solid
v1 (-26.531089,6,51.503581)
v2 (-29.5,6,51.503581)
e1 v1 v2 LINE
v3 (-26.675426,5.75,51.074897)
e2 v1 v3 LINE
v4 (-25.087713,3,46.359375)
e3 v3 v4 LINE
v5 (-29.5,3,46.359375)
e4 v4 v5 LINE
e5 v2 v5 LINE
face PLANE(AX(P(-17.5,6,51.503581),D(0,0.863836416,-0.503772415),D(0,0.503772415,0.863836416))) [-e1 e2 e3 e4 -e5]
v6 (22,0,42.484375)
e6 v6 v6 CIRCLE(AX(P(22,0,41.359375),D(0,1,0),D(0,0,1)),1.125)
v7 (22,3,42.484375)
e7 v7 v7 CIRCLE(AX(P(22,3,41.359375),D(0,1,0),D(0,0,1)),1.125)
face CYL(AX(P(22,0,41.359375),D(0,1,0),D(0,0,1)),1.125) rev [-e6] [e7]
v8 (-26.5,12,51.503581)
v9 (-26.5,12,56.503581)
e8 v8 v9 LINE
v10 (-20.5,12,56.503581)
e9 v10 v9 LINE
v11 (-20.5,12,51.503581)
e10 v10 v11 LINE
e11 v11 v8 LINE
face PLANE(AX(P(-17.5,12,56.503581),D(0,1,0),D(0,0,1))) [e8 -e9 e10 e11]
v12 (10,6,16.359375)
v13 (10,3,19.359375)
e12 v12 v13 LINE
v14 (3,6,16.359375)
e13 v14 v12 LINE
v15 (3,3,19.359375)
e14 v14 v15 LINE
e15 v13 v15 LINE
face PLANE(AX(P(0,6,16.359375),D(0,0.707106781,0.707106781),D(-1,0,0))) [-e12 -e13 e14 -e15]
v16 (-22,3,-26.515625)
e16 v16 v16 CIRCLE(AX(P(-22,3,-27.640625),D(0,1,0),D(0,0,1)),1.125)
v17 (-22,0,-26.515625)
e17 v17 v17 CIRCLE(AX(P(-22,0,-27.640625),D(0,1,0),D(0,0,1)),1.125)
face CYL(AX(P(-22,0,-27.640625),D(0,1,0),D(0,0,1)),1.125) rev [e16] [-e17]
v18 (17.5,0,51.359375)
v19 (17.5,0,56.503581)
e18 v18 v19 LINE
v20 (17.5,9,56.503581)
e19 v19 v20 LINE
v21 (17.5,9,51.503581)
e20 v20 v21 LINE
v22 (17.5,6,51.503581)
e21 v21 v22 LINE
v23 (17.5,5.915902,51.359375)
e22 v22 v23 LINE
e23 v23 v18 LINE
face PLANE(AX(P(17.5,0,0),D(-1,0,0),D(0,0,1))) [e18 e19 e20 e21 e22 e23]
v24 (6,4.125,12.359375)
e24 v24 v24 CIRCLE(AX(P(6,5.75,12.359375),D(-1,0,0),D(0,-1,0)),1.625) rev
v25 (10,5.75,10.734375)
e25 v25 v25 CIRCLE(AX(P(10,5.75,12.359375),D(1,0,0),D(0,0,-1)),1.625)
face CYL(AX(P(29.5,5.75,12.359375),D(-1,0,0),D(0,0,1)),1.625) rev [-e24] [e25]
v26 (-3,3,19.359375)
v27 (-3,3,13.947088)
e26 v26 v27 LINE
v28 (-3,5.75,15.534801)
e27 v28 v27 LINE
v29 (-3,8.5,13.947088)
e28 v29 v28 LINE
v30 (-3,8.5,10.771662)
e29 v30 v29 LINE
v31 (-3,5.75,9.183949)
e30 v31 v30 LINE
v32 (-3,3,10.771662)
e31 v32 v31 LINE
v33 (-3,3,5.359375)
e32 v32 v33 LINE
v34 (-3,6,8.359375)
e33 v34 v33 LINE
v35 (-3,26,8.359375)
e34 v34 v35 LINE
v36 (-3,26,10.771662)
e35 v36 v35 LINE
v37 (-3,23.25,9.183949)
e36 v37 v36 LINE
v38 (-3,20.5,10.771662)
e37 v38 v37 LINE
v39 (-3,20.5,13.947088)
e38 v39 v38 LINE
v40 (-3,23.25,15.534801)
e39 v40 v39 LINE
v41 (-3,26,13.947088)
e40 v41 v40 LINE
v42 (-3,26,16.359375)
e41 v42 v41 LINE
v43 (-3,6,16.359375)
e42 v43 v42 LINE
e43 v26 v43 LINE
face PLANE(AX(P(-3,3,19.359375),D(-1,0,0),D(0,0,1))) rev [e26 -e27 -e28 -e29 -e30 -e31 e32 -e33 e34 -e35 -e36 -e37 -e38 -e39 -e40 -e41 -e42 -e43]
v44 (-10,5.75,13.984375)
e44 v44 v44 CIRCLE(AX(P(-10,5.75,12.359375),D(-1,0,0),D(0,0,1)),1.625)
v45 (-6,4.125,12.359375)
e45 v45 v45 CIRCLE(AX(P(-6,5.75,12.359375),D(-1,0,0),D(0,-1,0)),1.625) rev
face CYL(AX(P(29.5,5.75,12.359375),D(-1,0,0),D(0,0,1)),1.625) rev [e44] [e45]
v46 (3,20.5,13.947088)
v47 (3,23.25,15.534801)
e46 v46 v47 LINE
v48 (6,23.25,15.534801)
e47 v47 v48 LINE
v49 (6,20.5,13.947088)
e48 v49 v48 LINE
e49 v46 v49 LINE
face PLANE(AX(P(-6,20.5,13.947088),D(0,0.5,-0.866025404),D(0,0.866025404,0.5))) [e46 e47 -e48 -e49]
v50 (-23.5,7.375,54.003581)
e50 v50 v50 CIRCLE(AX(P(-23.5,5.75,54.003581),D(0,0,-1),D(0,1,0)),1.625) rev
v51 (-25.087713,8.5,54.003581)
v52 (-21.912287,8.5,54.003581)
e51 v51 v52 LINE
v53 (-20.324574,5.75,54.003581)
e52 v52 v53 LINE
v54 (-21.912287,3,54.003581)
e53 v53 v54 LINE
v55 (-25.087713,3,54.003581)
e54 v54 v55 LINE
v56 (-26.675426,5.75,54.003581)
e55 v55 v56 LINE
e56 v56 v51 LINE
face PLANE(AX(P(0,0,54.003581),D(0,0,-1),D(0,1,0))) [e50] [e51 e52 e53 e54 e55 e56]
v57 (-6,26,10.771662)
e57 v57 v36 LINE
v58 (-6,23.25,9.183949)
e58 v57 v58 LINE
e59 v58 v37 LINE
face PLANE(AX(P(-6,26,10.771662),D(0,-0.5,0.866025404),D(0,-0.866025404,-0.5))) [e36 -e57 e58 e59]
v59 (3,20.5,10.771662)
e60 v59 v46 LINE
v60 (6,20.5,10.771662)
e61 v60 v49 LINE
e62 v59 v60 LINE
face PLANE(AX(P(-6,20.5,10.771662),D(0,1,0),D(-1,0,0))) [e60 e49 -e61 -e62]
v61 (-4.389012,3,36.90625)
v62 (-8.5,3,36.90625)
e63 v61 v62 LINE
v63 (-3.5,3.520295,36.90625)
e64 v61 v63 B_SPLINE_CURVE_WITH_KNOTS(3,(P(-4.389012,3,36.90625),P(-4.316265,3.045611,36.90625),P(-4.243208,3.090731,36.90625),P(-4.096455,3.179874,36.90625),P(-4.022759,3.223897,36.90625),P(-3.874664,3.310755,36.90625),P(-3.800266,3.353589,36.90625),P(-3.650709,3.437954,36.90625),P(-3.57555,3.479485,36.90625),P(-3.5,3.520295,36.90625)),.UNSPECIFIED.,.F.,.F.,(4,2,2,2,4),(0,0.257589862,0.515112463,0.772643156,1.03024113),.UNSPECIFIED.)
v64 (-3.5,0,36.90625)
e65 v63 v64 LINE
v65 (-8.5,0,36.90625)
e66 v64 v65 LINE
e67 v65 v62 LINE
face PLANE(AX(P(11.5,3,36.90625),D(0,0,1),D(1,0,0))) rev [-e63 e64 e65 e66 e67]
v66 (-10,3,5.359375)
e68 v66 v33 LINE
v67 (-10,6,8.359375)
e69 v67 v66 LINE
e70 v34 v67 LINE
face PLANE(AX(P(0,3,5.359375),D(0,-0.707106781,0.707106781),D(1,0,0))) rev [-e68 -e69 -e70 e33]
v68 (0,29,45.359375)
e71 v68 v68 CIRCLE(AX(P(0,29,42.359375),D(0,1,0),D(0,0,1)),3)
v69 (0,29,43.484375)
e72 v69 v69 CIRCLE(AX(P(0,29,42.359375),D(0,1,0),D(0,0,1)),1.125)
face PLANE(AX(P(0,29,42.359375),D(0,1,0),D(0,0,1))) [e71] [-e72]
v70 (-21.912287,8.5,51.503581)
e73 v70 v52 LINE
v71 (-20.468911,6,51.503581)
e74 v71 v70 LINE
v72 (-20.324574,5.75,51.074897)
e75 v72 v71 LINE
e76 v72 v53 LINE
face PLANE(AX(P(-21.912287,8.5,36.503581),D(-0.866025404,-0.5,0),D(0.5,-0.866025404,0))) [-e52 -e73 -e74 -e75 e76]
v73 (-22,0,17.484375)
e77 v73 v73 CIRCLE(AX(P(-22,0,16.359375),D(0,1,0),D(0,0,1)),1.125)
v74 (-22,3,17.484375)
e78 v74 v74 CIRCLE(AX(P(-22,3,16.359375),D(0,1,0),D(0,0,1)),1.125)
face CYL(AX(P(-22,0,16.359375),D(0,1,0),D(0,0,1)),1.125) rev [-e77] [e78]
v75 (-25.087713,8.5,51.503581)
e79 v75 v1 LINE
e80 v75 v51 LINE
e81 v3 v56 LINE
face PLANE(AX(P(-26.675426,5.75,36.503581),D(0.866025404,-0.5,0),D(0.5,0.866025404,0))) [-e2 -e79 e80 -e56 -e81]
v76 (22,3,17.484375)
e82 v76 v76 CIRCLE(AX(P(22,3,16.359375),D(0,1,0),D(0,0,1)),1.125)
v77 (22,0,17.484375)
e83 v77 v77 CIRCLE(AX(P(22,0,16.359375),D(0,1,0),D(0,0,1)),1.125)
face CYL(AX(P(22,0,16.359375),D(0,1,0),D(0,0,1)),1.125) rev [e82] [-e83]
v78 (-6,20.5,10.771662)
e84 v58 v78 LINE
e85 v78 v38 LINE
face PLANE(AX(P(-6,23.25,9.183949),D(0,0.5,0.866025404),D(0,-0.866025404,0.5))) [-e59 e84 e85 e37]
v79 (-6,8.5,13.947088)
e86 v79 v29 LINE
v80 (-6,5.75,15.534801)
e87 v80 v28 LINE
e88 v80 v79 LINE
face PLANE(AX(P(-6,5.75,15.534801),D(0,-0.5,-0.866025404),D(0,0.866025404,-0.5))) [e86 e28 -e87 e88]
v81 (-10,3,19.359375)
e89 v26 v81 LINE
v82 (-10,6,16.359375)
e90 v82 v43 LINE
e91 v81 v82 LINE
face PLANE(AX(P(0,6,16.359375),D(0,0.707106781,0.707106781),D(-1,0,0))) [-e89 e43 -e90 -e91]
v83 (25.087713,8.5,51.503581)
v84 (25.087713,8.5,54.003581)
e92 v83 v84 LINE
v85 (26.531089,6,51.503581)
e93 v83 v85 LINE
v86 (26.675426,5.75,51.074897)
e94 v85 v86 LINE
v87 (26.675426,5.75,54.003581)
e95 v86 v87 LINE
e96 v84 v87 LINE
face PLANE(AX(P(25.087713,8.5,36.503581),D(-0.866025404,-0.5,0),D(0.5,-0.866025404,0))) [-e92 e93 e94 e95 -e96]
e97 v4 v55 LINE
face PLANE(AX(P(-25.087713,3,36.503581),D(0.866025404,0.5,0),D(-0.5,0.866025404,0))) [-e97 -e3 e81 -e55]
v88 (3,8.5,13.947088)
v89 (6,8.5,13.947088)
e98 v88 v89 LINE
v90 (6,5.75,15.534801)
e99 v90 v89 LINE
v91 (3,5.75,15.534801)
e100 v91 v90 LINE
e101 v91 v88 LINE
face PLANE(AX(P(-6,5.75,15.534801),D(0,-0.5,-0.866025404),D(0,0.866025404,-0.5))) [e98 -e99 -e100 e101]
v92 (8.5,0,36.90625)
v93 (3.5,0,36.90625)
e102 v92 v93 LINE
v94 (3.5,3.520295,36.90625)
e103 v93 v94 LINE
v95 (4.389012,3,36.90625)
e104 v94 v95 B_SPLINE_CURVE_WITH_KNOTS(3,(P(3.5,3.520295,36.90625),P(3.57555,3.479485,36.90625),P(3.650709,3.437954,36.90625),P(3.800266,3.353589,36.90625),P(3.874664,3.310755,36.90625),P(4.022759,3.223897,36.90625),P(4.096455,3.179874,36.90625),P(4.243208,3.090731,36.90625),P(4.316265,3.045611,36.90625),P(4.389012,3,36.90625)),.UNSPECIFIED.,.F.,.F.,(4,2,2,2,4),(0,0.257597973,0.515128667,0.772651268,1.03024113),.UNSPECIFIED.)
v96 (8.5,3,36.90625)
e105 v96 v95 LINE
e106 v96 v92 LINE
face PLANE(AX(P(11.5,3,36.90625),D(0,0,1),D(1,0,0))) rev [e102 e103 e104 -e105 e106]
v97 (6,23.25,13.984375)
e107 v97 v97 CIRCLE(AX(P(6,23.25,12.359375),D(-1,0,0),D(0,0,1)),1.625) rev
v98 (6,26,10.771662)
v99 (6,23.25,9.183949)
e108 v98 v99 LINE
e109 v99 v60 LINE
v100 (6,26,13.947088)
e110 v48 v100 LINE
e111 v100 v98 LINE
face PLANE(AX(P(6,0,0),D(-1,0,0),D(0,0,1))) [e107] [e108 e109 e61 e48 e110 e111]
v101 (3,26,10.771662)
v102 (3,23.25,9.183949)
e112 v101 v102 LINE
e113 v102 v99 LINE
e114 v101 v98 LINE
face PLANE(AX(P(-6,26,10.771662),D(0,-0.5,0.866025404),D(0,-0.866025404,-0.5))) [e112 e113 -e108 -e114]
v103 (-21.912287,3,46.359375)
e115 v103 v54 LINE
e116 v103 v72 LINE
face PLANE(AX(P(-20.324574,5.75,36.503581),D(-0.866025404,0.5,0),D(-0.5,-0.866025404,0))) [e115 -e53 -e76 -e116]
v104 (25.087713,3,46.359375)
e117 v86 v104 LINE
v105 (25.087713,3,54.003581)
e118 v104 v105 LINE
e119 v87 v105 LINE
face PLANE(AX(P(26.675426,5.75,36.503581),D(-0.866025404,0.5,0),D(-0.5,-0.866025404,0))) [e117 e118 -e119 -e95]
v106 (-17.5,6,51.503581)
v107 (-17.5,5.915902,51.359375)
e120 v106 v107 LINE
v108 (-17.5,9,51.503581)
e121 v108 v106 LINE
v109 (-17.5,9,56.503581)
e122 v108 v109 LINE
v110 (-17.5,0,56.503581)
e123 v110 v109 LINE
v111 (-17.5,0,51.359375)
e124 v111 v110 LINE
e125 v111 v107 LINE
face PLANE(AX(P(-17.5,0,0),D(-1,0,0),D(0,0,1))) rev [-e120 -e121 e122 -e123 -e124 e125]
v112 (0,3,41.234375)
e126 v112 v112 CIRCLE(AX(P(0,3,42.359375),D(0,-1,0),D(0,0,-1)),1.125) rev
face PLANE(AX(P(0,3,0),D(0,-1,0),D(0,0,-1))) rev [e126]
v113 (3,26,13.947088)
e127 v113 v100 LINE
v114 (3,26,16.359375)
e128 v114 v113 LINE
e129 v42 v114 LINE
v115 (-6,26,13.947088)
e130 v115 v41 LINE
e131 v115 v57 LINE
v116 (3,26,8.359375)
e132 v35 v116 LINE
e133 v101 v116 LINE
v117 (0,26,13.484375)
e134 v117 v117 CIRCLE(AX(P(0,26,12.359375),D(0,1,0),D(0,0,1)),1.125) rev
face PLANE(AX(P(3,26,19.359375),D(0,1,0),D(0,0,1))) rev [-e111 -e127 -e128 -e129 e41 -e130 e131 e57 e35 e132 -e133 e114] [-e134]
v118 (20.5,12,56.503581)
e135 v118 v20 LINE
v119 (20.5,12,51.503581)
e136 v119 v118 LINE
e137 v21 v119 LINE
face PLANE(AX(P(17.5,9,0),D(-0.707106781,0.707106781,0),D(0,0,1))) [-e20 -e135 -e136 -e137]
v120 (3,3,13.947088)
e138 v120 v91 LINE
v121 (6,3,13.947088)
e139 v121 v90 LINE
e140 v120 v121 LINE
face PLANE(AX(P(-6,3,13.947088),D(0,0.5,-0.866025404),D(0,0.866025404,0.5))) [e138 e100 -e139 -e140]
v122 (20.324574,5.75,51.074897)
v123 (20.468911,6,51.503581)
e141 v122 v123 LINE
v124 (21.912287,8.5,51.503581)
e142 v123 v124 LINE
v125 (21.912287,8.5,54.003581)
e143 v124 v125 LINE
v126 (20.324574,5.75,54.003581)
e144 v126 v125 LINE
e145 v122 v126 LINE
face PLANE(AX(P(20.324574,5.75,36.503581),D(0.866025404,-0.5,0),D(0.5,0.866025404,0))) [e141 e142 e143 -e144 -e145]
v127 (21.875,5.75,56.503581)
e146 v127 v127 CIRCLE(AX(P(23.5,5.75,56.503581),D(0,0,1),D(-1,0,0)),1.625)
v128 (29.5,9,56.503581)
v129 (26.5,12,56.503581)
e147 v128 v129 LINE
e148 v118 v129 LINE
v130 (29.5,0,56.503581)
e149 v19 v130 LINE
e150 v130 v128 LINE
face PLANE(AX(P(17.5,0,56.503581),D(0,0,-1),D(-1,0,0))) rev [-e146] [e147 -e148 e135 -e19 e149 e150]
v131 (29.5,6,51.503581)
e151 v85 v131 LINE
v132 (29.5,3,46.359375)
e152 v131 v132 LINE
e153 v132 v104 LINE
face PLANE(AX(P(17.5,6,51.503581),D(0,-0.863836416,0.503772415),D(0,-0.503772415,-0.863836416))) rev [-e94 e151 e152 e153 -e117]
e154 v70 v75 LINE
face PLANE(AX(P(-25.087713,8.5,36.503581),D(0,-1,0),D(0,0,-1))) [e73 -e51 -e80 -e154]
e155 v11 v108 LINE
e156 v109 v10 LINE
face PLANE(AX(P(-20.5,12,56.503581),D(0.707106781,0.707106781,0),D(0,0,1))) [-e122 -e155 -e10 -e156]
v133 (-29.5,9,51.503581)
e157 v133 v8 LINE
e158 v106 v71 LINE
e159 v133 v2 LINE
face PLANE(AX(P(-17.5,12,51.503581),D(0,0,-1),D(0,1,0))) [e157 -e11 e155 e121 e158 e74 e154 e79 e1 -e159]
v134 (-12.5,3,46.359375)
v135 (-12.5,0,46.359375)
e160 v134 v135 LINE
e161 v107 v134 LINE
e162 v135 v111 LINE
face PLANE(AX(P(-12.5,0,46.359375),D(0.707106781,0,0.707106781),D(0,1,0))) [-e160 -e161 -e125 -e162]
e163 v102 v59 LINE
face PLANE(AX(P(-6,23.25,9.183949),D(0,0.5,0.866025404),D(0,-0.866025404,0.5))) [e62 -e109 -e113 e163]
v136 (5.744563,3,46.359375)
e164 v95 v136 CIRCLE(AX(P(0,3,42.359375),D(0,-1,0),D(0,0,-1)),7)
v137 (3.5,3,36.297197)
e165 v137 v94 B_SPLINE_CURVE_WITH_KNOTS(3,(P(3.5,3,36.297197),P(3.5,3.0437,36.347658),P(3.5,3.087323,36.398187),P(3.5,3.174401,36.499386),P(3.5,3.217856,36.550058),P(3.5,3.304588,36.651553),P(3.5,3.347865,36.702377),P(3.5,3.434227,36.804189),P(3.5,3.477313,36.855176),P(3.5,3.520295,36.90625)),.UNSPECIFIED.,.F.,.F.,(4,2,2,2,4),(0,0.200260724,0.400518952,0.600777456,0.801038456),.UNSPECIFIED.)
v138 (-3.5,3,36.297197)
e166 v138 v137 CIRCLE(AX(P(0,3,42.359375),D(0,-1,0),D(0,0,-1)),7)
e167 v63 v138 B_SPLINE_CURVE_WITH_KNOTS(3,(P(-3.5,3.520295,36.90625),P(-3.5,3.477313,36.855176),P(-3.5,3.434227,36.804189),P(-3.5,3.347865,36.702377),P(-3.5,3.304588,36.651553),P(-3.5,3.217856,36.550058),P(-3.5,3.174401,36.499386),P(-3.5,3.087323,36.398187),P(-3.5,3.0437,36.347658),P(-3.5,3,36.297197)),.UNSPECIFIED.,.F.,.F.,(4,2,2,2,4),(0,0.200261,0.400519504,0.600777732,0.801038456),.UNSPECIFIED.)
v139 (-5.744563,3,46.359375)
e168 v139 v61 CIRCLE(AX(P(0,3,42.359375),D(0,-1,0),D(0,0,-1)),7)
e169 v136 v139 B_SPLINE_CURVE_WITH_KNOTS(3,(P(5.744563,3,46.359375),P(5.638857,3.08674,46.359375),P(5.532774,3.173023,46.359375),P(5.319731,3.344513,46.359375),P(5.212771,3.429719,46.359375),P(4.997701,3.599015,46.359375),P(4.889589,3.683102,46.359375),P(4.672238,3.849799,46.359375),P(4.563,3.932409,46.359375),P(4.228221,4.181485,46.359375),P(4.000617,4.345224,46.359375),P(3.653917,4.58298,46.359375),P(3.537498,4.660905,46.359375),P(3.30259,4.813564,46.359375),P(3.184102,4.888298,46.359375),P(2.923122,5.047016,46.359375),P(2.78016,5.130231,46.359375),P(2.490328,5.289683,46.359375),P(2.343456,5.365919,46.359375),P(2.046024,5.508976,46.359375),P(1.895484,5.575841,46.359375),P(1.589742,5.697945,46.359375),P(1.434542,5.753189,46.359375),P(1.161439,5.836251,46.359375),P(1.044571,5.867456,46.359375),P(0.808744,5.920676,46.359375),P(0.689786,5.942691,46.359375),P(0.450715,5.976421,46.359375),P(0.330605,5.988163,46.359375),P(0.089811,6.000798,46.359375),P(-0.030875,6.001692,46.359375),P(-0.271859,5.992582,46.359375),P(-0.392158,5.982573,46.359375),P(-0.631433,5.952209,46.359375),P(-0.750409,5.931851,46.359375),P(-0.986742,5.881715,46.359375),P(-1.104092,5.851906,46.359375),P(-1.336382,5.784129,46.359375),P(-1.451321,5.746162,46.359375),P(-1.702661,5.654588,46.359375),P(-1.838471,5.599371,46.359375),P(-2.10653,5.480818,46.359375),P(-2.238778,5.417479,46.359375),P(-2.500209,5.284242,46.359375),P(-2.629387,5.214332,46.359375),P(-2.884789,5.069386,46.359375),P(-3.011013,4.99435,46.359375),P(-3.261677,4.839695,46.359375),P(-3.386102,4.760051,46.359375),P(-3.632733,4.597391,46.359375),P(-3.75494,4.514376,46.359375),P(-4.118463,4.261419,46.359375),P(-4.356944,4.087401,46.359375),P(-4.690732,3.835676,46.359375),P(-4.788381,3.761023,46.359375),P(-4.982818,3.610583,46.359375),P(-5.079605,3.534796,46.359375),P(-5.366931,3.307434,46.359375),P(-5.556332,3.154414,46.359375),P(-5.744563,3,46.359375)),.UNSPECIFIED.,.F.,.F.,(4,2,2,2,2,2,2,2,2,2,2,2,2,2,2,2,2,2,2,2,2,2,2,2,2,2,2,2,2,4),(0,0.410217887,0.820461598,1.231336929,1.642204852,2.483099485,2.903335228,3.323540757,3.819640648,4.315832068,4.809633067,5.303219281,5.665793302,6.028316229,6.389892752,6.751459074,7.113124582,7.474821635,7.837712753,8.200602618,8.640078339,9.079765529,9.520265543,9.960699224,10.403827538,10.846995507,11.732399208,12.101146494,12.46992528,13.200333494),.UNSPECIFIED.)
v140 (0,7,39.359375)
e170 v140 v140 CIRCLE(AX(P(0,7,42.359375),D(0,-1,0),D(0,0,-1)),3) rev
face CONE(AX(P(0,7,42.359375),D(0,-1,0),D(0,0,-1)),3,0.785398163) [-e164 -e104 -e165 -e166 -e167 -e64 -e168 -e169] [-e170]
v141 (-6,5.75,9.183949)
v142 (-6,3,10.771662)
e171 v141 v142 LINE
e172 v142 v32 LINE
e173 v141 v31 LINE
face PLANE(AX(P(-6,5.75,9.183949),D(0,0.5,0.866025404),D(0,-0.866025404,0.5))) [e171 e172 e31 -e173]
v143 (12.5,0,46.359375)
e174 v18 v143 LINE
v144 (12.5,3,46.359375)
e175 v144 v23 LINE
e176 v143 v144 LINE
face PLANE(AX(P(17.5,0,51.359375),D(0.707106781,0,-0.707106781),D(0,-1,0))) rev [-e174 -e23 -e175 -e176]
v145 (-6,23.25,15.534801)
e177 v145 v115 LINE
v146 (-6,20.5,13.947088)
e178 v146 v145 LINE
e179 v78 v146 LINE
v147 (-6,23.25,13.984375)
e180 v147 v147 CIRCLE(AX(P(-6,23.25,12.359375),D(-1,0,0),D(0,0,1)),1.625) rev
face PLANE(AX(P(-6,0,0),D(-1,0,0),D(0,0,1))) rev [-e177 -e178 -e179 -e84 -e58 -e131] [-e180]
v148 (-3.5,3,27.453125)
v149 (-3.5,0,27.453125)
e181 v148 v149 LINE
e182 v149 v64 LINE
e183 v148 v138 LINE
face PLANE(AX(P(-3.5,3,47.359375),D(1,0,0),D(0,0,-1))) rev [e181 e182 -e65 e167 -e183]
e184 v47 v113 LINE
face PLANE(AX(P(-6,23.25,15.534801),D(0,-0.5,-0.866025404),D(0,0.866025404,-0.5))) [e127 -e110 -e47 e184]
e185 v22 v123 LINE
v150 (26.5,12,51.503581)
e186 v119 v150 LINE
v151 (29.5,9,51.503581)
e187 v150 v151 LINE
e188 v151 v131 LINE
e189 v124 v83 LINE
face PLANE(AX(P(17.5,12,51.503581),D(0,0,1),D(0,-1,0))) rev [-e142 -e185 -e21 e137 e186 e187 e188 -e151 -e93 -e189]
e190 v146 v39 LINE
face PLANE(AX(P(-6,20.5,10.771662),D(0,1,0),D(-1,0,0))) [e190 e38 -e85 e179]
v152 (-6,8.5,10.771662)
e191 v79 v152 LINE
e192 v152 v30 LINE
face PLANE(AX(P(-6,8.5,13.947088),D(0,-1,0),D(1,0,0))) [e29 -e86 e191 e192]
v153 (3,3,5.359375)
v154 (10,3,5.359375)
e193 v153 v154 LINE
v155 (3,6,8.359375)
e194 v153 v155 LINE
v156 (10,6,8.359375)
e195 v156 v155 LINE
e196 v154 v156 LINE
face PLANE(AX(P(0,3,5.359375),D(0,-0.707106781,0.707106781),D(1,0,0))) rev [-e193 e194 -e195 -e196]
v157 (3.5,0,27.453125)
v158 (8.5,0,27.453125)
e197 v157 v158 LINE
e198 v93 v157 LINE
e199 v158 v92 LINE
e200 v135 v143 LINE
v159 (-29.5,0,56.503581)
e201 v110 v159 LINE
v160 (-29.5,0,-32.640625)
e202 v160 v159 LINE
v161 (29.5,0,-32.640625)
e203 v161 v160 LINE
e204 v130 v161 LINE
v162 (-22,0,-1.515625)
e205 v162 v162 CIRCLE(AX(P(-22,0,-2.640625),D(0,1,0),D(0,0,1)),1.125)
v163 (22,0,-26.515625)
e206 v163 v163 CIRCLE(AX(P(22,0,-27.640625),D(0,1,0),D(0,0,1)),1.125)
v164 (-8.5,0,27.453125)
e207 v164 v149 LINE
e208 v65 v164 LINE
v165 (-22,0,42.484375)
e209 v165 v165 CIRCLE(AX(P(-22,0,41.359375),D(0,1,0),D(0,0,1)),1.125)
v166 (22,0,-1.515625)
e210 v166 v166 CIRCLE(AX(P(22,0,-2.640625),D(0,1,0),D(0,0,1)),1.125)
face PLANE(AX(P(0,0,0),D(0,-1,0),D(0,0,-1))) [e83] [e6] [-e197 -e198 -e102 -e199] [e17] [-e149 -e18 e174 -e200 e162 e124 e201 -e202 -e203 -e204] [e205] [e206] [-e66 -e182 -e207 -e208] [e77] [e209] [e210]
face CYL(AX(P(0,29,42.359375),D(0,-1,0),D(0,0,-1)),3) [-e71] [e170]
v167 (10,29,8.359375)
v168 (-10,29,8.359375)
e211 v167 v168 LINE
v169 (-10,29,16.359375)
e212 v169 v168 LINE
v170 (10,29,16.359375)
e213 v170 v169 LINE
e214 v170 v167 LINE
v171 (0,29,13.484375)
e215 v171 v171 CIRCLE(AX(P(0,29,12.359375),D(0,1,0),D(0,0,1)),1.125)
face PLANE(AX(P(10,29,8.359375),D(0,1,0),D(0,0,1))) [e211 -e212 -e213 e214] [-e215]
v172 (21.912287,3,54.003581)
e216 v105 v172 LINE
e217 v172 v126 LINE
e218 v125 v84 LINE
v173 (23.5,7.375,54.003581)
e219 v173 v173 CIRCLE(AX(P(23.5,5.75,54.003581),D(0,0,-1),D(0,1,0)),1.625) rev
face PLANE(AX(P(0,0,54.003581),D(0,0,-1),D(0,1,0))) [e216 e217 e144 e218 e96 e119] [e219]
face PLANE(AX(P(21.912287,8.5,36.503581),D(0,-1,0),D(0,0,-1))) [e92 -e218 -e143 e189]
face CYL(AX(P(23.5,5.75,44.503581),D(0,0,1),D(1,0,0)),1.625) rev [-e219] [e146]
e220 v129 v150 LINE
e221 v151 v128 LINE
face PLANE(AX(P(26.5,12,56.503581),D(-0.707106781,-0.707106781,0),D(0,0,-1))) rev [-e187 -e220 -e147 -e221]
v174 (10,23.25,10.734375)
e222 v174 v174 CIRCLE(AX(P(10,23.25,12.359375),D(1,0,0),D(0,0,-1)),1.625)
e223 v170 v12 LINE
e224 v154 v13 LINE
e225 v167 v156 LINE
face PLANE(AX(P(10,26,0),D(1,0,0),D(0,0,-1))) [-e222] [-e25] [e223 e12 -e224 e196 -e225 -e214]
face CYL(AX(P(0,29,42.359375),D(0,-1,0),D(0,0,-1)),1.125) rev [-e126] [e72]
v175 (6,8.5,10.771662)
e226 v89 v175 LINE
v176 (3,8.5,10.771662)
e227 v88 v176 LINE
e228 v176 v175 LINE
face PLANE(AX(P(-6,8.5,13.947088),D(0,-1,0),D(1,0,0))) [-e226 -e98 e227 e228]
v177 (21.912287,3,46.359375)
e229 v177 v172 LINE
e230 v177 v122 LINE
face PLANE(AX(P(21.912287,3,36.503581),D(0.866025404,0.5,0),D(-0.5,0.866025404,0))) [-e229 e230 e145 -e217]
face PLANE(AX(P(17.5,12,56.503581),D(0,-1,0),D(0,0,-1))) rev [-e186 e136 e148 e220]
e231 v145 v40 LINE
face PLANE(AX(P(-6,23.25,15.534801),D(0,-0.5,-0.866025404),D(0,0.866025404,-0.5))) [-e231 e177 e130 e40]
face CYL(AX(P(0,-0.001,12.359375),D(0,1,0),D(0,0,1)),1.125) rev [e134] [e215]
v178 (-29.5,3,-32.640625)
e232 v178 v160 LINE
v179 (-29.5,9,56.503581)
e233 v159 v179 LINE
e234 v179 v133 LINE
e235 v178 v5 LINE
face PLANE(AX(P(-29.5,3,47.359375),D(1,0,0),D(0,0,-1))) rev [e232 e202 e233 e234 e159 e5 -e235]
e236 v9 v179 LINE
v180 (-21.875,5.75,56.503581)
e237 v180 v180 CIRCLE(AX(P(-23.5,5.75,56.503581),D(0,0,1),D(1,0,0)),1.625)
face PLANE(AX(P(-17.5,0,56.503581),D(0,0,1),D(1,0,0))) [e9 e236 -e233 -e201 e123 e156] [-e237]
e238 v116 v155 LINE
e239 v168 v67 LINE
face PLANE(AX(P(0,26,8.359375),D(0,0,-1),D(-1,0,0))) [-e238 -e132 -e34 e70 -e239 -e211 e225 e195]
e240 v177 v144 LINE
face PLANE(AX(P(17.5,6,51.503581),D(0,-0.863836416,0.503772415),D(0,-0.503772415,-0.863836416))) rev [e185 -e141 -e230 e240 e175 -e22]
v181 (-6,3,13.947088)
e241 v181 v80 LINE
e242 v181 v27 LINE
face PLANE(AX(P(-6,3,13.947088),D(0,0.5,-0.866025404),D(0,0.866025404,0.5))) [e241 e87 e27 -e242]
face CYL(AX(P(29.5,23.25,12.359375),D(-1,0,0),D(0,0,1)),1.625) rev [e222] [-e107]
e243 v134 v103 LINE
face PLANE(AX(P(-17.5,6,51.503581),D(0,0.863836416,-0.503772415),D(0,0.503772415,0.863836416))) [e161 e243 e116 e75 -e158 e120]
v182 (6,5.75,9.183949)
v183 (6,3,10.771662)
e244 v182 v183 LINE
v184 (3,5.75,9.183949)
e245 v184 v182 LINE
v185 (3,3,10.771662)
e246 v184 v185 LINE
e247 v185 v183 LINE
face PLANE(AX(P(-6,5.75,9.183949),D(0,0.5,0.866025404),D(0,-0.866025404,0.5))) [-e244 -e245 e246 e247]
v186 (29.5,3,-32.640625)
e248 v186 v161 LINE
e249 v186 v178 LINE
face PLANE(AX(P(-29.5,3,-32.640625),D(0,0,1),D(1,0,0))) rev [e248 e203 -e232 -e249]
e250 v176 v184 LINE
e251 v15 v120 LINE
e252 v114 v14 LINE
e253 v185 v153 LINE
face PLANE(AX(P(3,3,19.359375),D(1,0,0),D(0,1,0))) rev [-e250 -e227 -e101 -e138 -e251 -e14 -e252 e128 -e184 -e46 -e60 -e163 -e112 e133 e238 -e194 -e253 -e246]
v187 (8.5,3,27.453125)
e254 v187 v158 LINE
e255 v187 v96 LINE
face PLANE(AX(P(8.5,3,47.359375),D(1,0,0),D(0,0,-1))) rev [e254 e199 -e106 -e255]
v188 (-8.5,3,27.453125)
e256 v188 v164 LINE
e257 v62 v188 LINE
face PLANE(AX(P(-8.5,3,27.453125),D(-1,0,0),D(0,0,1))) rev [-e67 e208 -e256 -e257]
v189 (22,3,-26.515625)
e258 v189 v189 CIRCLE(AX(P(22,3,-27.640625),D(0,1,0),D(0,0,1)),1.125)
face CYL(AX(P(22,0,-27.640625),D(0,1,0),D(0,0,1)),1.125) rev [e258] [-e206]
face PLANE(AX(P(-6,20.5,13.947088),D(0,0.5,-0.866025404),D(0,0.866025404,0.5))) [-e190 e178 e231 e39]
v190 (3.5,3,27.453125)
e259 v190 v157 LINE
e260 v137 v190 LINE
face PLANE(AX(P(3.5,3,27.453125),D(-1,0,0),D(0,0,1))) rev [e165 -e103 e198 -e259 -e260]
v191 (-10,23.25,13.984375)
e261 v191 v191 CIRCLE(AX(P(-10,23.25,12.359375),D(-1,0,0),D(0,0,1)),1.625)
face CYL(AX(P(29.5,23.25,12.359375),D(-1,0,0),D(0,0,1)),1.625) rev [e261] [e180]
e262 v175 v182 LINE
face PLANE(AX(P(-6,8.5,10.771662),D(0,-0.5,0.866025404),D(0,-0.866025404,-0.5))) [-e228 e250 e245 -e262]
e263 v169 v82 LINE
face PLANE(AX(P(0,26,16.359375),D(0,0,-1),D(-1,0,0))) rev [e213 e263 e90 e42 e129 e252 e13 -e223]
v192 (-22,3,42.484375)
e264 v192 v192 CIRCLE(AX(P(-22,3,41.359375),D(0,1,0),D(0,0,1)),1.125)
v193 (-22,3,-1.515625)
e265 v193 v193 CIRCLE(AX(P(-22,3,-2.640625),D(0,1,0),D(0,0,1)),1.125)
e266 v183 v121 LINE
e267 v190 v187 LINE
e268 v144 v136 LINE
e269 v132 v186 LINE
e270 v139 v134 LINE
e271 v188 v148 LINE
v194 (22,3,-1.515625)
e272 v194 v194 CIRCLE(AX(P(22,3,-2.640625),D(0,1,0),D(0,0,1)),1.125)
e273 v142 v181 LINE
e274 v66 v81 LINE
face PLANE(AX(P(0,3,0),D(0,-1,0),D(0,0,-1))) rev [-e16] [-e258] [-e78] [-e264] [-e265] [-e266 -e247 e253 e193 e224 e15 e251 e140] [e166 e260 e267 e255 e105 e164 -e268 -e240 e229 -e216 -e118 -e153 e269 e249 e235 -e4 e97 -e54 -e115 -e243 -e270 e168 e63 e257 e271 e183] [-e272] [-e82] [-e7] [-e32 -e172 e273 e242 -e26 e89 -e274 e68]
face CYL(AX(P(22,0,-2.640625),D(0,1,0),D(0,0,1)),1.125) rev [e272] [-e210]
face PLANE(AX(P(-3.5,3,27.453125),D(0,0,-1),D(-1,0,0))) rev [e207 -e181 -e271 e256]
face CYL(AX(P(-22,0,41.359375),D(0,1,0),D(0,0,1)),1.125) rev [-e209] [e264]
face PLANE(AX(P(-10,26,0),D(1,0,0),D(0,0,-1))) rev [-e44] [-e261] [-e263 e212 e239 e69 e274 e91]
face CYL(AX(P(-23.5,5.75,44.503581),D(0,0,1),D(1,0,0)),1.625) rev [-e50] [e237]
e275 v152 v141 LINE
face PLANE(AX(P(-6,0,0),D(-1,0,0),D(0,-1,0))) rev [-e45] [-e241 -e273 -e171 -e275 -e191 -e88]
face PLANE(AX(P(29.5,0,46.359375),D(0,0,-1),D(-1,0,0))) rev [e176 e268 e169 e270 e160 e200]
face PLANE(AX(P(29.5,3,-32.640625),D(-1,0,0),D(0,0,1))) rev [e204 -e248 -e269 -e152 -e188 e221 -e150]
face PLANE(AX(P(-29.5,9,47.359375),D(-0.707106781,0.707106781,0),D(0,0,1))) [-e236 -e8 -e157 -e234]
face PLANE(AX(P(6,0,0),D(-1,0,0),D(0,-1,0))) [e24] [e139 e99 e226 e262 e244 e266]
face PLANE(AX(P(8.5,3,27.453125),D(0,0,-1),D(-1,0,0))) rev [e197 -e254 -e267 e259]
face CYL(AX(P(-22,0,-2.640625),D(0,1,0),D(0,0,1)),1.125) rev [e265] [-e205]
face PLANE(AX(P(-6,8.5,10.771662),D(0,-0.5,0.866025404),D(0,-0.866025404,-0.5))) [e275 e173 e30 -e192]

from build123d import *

# Parameters (mm, degrees)
BASE_DEPTH                     = 3
SKETCH1_W                      = 20
SKETCH1_H                      = 7
SKETCH1_H_2                    = 8
SKETCH1_W_2                    = 7
SKETCH1_H_3                    = 38.5
SOPORTE_MOTORES_DEPTH          = 23
SOPORTE_PALA_DEPTH             = 85.65548432
SKETCH3_R                      = 1.625
AGUJEROS_MOTORES_DEPTH         = 73.427902257
SKETCH4_R                      = 1
AGUJEROS_PALA_DEPTH            = 4
HUECO_SOPORTE_POSTERIOR_DEPTH  = 10
CORTE_SOPORTE_PALA_MOTOR_REACH = 71.098
BOSS_EXTRUDE2_DEPTH            = 20
CHAMFER1_SIZE                  = 3
CORTAR_EXTRUIR1_DEPTH          = 85.65548432
CORTAR_EXTRUIR1_DEPTH_BACK     = 85.65548432
SALIENTE_EXTRUIR1_START        = -59
SALIENTE_EXTRUIR1_DEPTH        = 12
SALIENTE_EXTRUIR2_DEPTH        = 12
CHAFL_N1_SIZE                  = 5
CROQUIS7_R                     = 1.625
CORTAR_EXTRUIR2_DEPTH          = 12
CORTAR_EXTRUIR3_DEPTH          = 15
CORTAR_EXTRUIR3_DEPTH_BACK     = 2.5
CORTAR_EXTRUIR5_DEPTH          = 86.730127162
CORTAR_EXTRUIR5_DEPTH_BACK     = 86.730127162
CROQUIS10_W                    = 13.75510153
CROQUIS10_H                    = 25.014777128
SALIENTE_EXTRUIR3_START        = -20
CROQUIS11_W                    = 8
CROQUIS11_H                    = 3
SALIENTE_EXTRUIR3_DEPTH        = 20
CORTAR_EXTRUIR6_START          = -11
CROQUIS12_W                    = 6
CROQUIS12_H                    = 23
CORTAR_EXTRUIR6_DEPTH          = 14
CORTAR_EXTRUIR7_DEPTH          = 9
CORTAR_EXTRUIR7_DEPTH_BACK     = 3
CHAFL_N2_SIZE                  = 3
CROQUIS14_R                    = 3
CROQUIS14_R_2                  = 1.125
SALIENTE_EXTRUIR4_DEPTH        = 26
CHAFL_N3_SIZE                  = 4
CORTAR_EXTRUIR8_REACH          = 72.028
CROQUIS15_R                    = 1.125
CROQUIS16_R                    = 1.125
CORTAR_EXTRUIR9_DEPTH          = 69.839702957


with BuildPart() as part:
    # Croquis1 → Base (new body)
    with BuildSketch(Plane(origin=(0, 0, 0), x_dir=(1, 0, 0), z_dir=(0, 1, 0))):
        Polygon((-29.5, 32.640625), (29.5, 32.640625), (29.5, -47.359375), (8.5, -47.359375), (8.5, -27.453125), (3.5, -27.453125), (3.5, -47.359375), (-3.5, -47.359375), (-3.5, -27.453125), (-8.5, -27.453125), (-8.5, -47.359375), (-29.5, -47.359375), align=None)
    extrude(amount=BASE_DEPTH)

    # Sketch1 → Soporte Motores (add)
    with BuildSketch(Plane(origin=(0, 3, 0), x_dir=(1, 0, 0), z_dir=(0, 1, 0))):
        with Locations((0, 19.640625)):
            Rectangle(SKETCH1_W, SKETCH1_H)
        with Locations((0, -12.359375)):
            Rectangle(SKETCH1_W, SKETCH1_H_2)
        with Locations((0, -35.609375)):
            Rectangle(SKETCH1_W_2, SKETCH1_H_3)
    extrude(amount=SOPORTE_MOTORES_DEPTH)

    # Sketch2 → Soporte Pala (cut, through all)
    with BuildSketch(Plane(origin=(29.5, 0, 0), x_dir=(0, 0, -1), z_dir=(1, 0, 0))):
        Polygon((-54.859375, 26), (-46.359375, 0), (-47.359375, 0), (-47.359375, 3), (-54.859375, 3), align=None)
    extrude(amount=-SOPORTE_PALA_DEPTH, mode=Mode.SUBTRACT)

    # Sketch3 → Agujeros Motores (cut, through all)
    with BuildSketch(Plane.ZY.offset(10)):
        with Locations((12.359375, 5.75)):
            Circle(SKETCH3_R)
        with Locations((12.359375, 23.25)):
            Circle(SKETCH3_R)
    extrude(amount=-AGUJEROS_MOTORES_DEPTH, mode=Mode.SUBTRACT)

    # Sketch4 → Agujeros pala (cut)
    with BuildSketch(Plane(origin=(0, -13.692511694, 41.882976946), x_dir=(1, 0, 0), z_dir=(0, -0.31073885630742226, 0.9504953251756452))):
        with Locations(Location((0, 19.405659167, 0), (0, 0, 270))):
            Circle(SKETCH4_R)
        with Locations(Location((0, 29.405659167, 0), (0, 0, 270))):
            Circle(SKETCH4_R)
    extrude(amount=-AGUJEROS_PALA_DEPTH, mode=Mode.SUBTRACT)

    # Croquis2 → Hueco Soporte Posterior (cut)
    with BuildSketch(Plane(origin=(0, 0, -23.140625), x_dir=(-1, 0, 0), z_dir=(0, 0, -1))):
        Polygon((-5, 6), (-5, 3), (5, 3), (5, 6), (5, 21), (-5, 21), align=None)
    extrude(amount=-HUECO_SOPORTE_POSTERIOR_DEPTH, mode=Mode.SUBTRACT)

    # Croquis3 → Corte_Soporte_PALA_MOTOR (cut, up to next)
    with BuildSketch(Plane.ZY.offset(3.5), mode=Mode.PRIVATE) as corte_soporte_pala_motor_sk1:
        Polygon((21.90625, 3), (36.90625, 3), (36.90625, 26), (21.90625, 26), (16.359375, 26), (16.359375, 3), align=None)
    corte_soporte_pala_motor_tool1 = extrude(corte_soporte_pala_motor_sk1.sketch, amount=-CORTE_SOPORTE_PALA_MOTOR_REACH, mode=Mode.PRIVATE) & part.part
    add(corte_soporte_pala_motor_tool1.solids().sort_by_distance((-3.5, 14.5, 26.632812))[0], mode=Mode.SUBTRACT)

    # Sketch5 → Boss-Extrude2 (add)
    with BuildSketch(Plane(origin=(-8.5, 0, 0), x_dir=(0, 0, -1), z_dir=(1, 0, 0))):
        Polygon((-36.90625, 3), (-36.90625, 0), (-46.359375, 0), (-47.340144231, 3), align=None)
    extrude(amount=BOSS_EXTRUDE2_DEPTH)

    # Chamfer1
    # the kernel refuses this chamfer: 3 mm, written as the material it adds along each edge
    with BuildSketch(Plane(origin=(10, 3, -16.140625), x_dir=(0, -0.02749587661058635, 0.9996219169112968), z_dir=(-1, 0, 0)), Plane(origin=(5, 3, -23.140625), x_dir=(0, -0.027495876610586365, -0.9996219169112968), z_dir=(1, 0, 0)), Plane(origin=(-5, 3, -16.140625), x_dir=(0, -0.02749587661058635, 0.9996219169112968), z_dir=(-1, 0, 0)), Plane(origin=(-10, 3, -23.140625), x_dir=(0, -0.027495876610586365, -0.9996219169112968), z_dir=(1, 0, 0))) as chamfer1_piece_1:
        Polygon((CHAMFER1_SIZE * 0.999621916911, CHAMFER1_SIZE * 0.0274958766106), (-CHAMFER1_SIZE * 0.0274958766106, CHAMFER1_SIZE * 0.999621916911), (0, 0), align=None)
    extrude(amount=5)
    with BuildSketch(Plane(origin=(-5, 3, -23.140625), x_dir=(0.9996219169112968, -0.027495876610586348, 0), z_dir=(0, 0, 1))) as chamfer1_piece_2:
        Polygon((CHAMFER1_SIZE * 0.999621916911, CHAMFER1_SIZE * 0.0274958766106), (-CHAMFER1_SIZE * 0.0274958766106, CHAMFER1_SIZE * 0.999621916911), (0, 0), align=None)
    extrude(amount=7)
    with BuildSketch(Plane(origin=(5, 3, -23.140625), x_dir=(-0.9996219169112968, -0.027495876610586348, 0), z_dir=(0, 0, 1))) as chamfer1_piece_3:
        Polygon((CHAMFER1_SIZE * 0.999621916911, -CHAMFER1_SIZE * 0.0274958766106), (-CHAMFER1_SIZE * 0.0274958766106, -CHAMFER1_SIZE * 0.999621916911), (0, 0), align=None)
    extrude(amount=7)
    with BuildSketch(Plane(origin=(-3.5, 3, 55.055193195), x_dir=(-0.9996219169112969, -0.027495876610586348, 0), z_dir=(0, 0, -1))) as chamfer1_piece_4_section:
        Polygon((CHAMFER1_SIZE * 0.999621916911, CHAMFER1_SIZE * 0.0274958766106), (-CHAMFER1_SIZE * 0.0274958766106, CHAMFER1_SIZE * 0.999621916911), (0, 0), align=None)
    chamfer1_piece_4 = extrude(amount=18.148943195, mode=Mode.PRIVATE)
    chamfer1_piece_4 = split(chamfer1_piece_4, bisect_by=Plane(origin=(-4.480095354, 2.417288908, 47.149642528), z_dir=(0, 0.3107388563074222, -0.9504953251756452)), keep=Keep.TOP, mode=Mode.PRIVATE)
    add(chamfer1_piece_4)
    with BuildSketch(Plane(origin=(3.5, 3, 36.90625), x_dir=(0.9996219169112969, -0.027495876610586348, 0), z_dir=(0, 0, 1))) as chamfer1_piece_5_section:
        Polygon((CHAMFER1_SIZE * 0.999621916911, CHAMFER1_SIZE * 0.0274958766106), (-CHAMFER1_SIZE * 0.0274958766106, CHAMFER1_SIZE * 0.999621916911), (0, 0), align=None)
    chamfer1_piece_5 = extrude(amount=18.148943195, mode=Mode.PRIVATE)
    chamfer1_piece_5 = split(chamfer1_piece_5, bisect_by=Plane(origin=(4.480095354, 2.417288908, 47.149642528), z_dir=(0, 0.3107388563074222, -0.9504953251756452)), keep=Keep.TOP, mode=Mode.PRIVATE)
    add(chamfer1_piece_5)
    with BuildSketch(Plane(origin=(-10, 3, 8.359375), x_dir=(0, -0.02749587661058634, -0.9996219169112968), z_dir=(1, 0, 0)), Plane(origin=(10, 3, 16.359375), x_dir=(0, -0.027495876610586334, 0.9996219169112968), z_dir=(-1, 0, 0))) as chamfer1_piece_6:
        Polygon((CHAMFER1_SIZE * 0.999621916911, CHAMFER1_SIZE * 0.0274958766106), (-CHAMFER1_SIZE * 0.0274958766106, CHAMFER1_SIZE * 0.999621916911), (0, 0), align=None)
    extrude(amount=20)
    with BuildSketch(Plane(origin=(5, 3, -23.140625), x_dir=(-0.9996219169112968, -0.027495876610586348, 0), z_dir=(0, 0, 1))) as chamfer1_piece_7a_section:
        Polygon((CHAMFER1_SIZE * 0.999621916911, -CHAMFER1_SIZE * 0.0274958766106), (-CHAMFER1_SIZE * 0.0274958766106, -CHAMFER1_SIZE * 0.999621916911), (0, 0), align=None)
    chamfer1_piece_7a = extrude(amount=14.715048964, mode=Mode.PRIVATE)
    chamfer1_piece_7a = split(chamfer1_piece_7a, bisect_by=Plane(origin=(4.01061912, 3.98938088, -16.140625), z_dir=(0, 0, 1)), keep=Keep.TOP, mode=Mode.PRIVATE)
    with BuildSketch(Plane(origin=(10, 3, -16.140625), x_dir=(0, -0.02749587661058635, 0.9996219169112968), z_dir=(-1, 0, 0))) as chamfer1_piece_7b_section:
        Polygon((CHAMFER1_SIZE * 0.999621916911, CHAMFER1_SIZE * 0.0274958766106), (-CHAMFER1_SIZE * 0.0274958766106, CHAMFER1_SIZE * 0.999621916911), (0, 0), align=None)
    chamfer1_piece_7b = extrude(amount=12.715048964, mode=Mode.PRIVATE)
    chamfer1_piece_7b = split(chamfer1_piece_7b, bisect_by=Plane(origin=(5, 3.98938088, -15.15124412), z_dir=(-1, 0, 0)), keep=Keep.TOP, mode=Mode.PRIVATE)
    chamfer1_piece_7 = chamfer1_piece_7a & chamfer1_piece_7b
    add(chamfer1_piece_7)
    with BuildSketch(Plane(origin=(-2.715048964, 3, -23.140625), x_dir=(0, -0.027495876610586334, -0.9996219169112968), z_dir=(1, 0, 0))) as chamfer1_piece_8a_section:
        Polygon((CHAMFER1_SIZE * 0.999621916911, CHAMFER1_SIZE * 0.0274958766106), (-CHAMFER1_SIZE * 0.0274958766106, CHAMFER1_SIZE * 0.999621916911), (0, 0), align=None)
    chamfer1_piece_8a = extrude(amount=12.715048964, mode=Mode.PRIVATE)
    chamfer1_piece_8a = split(chamfer1_piece_8a, bisect_by=Plane(origin=(5, 3.98938088, -24.13000588), z_dir=(-1, 0, 0)), keep=Keep.TOP, mode=Mode.PRIVATE)
    with BuildSketch(Plane(origin=(5, 3, -30.855673964), x_dir=(-0.9996219169112968, -0.027495876610586348, 0), z_dir=(0, 0, 1))) as chamfer1_piece_8b_section:
        Polygon((CHAMFER1_SIZE * 0.999621916911, -CHAMFER1_SIZE * 0.0274958766106), (-CHAMFER1_SIZE * 0.0274958766106, -CHAMFER1_SIZE * 0.999621916911), (0, 0), align=None)
    chamfer1_piece_8b = extrude(amount=14.715048964, mode=Mode.PRIVATE)
    chamfer1_piece_8b = split(chamfer1_piece_8b, bisect_by=Plane(origin=(4.01061912, 3.98938088, -23.140625), z_dir=(0, 0, -1)), keep=Keep.TOP, mode=Mode.PRIVATE)
    chamfer1_piece_8 = chamfer1_piece_8a & chamfer1_piece_8b
    add(chamfer1_piece_8)
    with BuildSketch(Plane(origin=(-10, 3, -23.140625), x_dir=(0, -0.027495876610586365, -0.9996219169112968), z_dir=(1, 0, 0))) as chamfer1_piece_9a_section:
        Polygon((CHAMFER1_SIZE * 0.999621916911, CHAMFER1_SIZE * 0.0274958766106), (-CHAMFER1_SIZE * 0.0274958766106, CHAMFER1_SIZE * 0.999621916911), (0, 0), align=None)
    chamfer1_piece_9a = extrude(amount=12.715048964, mode=Mode.PRIVATE)
    chamfer1_piece_9a = split(chamfer1_piece_9a, bisect_by=Plane(origin=(-5, 3.98938088, -24.13000588), z_dir=(1, 0, 0)), keep=Keep.TOP, mode=Mode.PRIVATE)
    with BuildSketch(Plane(origin=(-5, 3, -30.855673964), x_dir=(0.9996219169112968, -0.027495876610586348, 0), z_dir=(0, 0, 1))) as chamfer1_piece_9b_section:
        Polygon((CHAMFER1_SIZE * 0.999621916911, CHAMFER1_SIZE * 0.0274958766106), (-CHAMFER1_SIZE * 0.0274958766106, CHAMFER1_SIZE * 0.999621916911), (0, 0), align=None)
    chamfer1_piece_9b = extrude(amount=14.715048964, mode=Mode.PRIVATE)
    chamfer1_piece_9b = split(chamfer1_piece_9b, bisect_by=Plane(origin=(-4.01061912, 3.98938088, -23.140625), z_dir=(0, 0, -1)), keep=Keep.TOP, mode=Mode.PRIVATE)
    chamfer1_piece_9 = chamfer1_piece_9a & chamfer1_piece_9b
    add(chamfer1_piece_9)
    with BuildSketch(Plane(origin=(2.715048964, 3, -16.140625), x_dir=(0, -0.02749587661058635, 0.9996219169112968), z_dir=(-1, 0, 0))) as chamfer1_piece_10a_section:
        Polygon((CHAMFER1_SIZE * 0.999621916911, CHAMFER1_SIZE * 0.0274958766106), (-CHAMFER1_SIZE * 0.0274958766106, CHAMFER1_SIZE * 0.999621916911), (0, 0), align=None)
    chamfer1_piece_10a = extrude(amount=12.715048964, mode=Mode.PRIVATE)
    chamfer1_piece_10a = split(chamfer1_piece_10a, bisect_by=Plane(origin=(-5, 3.98938088, -15.15124412), z_dir=(1, 0, 0)), keep=Keep.TOP, mode=Mode.PRIVATE)
    with BuildSketch(Plane(origin=(-5, 3, -23.140625), x_dir=(0.9996219169112968, -0.027495876610586348, 0), z_dir=(0, 0, 1))) as chamfer1_piece_10b_section:
        Polygon((CHAMFER1_SIZE * 0.999621916911, CHAMFER1_SIZE * 0.0274958766106), (-CHAMFER1_SIZE * 0.0274958766106, CHAMFER1_SIZE * 0.999621916911), (0, 0), align=None)
    chamfer1_piece_10b = extrude(amount=14.715048964, mode=Mode.PRIVATE)
    chamfer1_piece_10b = split(chamfer1_piece_10b, bisect_by=Plane(origin=(-4.01061912, 3.98938088, -16.140625), z_dir=(0, 0, 1)), keep=Keep.TOP, mode=Mode.PRIVATE)
    chamfer1_piece_10 = chamfer1_piece_10a & chamfer1_piece_10b
    add(chamfer1_piece_10)

    # Croquis4 → Cortar-Extruir1 (cut, two sides: drawn at the far end of the back side and taken through both)
    with BuildSketch(Plane.ZY.offset(29.5).offset(-CORTAR_EXTRUIR1_DEPTH_BACK)):
        Polygon((36.90625, 26), (36.90625, 3), (46.359375, 3), (46.359375, 0), (54.859375, 26), align=None)
    extrude(amount=CORTAR_EXTRUIR1_DEPTH + CORTAR_EXTRUIR1_DEPTH_BACK, mode=Mode.SUBTRACT)

    # Croquis5 → Saliente-Extruir1 (add)
    with BuildSketch(Plane.ZY.offset(29.5).offset(SALIENTE_EXTRUIR1_START)):
        Polygon((46.359375, 0), (56.503581331, 0), (56.503581331, 12), (51.503581331, 12), (51.503581331, 6), (46.359375, 3), align=None)
    extrude(amount=SALIENTE_EXTRUIR1_DEPTH)

    # Croquis6 → Saliente-Extruir2 (add)
    with BuildSketch(Plane.ZY.offset(29.5)):
        Polygon((46.359375, 3), (46.359375, 0), (56.503581331, 0), (56.503581331, 12), (51.503581331, 12), (51.503581331, 6), align=None)
    extrude(amount=-SALIENTE_EXTRUIR2_DEPTH)

    # Chaflán1
    chafl_n1_edges = [part.edges().sort_by_distance(p)[0] for p in [
        (-17.5, 1.5, 46.359375),
        (17.5, 1.5, 46.359375),
    ]]
    chamfer(chafl_n1_edges, length=CHAFL_N1_SIZE)

    # Croquis7 → Cortar-Extruir2 (cut)
    with BuildSketch(Plane.XY.offset(56.503581331)):
        with Locations((-23.5, 5.75)):
            Circle(CROQUIS7_R)
        with Locations(Location((23.5, 5.75, 0), (0, 0, 8.849883098))):
            Circle(CROQUIS7_R)
    extrude(amount=-CORTAR_EXTRUIR2_DEPTH, mode=Mode.SUBTRACT)

    # Croquis8 → Cortar-Extruir3 (cut, two sides: drawn at the far end of the back side and taken through both)
    with BuildSketch(Plane(origin=(0, 0, 51.503581331), x_dir=(-1, 0, 0), z_dir=(0, 0, -1)).offset(-CORTAR_EXTRUIR3_DEPTH_BACK)):
        Polygon((-21.91228676, 3), (-20.324573519, 5.75), (-21.91228676, 8.5), (-25.08771324, 8.5), (-26.675426481, 5.75), (-25.08771324, 3), align=None)
        Polygon((25.08771324, 3), (26.675426481, 5.75), (25.08771324, 8.5), (21.91228676, 8.5), (20.324573519, 5.75), (21.91228676, 3), align=None)
    extrude(amount=CORTAR_EXTRUIR3_DEPTH + CORTAR_EXTRUIR3_DEPTH_BACK, mode=Mode.SUBTRACT)

    # Croquis10 → Cortar-Extruir5 (cut, two sides: drawn at the far end of the back side and taken through both)
    with BuildSketch(Plane.ZY.offset(29.5).offset(-CORTAR_EXTRUIR5_DEPTH_BACK)):
        with Locations((-19.263074235, 15.507388564)):
            Rectangle(CROQUIS10_W, CROQUIS10_H)
    extrude(amount=CORTAR_EXTRUIR5_DEPTH + CORTAR_EXTRUIR5_DEPTH_BACK, mode=Mode.SUBTRACT)

    # Croquis11 → Saliente-Extruir3 (add)
    with BuildSketch(Plane.ZY.offset(10).offset(SALIENTE_EXTRUIR3_START)):
        with Locations((12.359375, 27.5)):
            Rectangle(CROQUIS11_W, CROQUIS11_H)
    extrude(amount=SALIENTE_EXTRUIR3_DEPTH)

    # Croquis12 → Cortar-Extruir6 (cut)
    with BuildSketch(Plane(origin=(0, 0, 8.359375), x_dir=(-1, 0, 0), z_dir=(0, 0, -1)).offset(CORTAR_EXTRUIR6_START)):
        with Locations((0, 14.5)):
            Rectangle(CROQUIS12_W, CROQUIS12_H)
    extrude(amount=CORTAR_EXTRUIR6_DEPTH, mode=Mode.SUBTRACT)

    # Croquis13 → Cortar-Extruir7 (cut, two sides: drawn at the far end of the back side and taken through both)
    with BuildSketch(Plane.ZY.offset(-3).offset(-CORTAR_EXTRUIR7_DEPTH_BACK)):
        Polygon((13.94708824, 3), (15.534801481, 5.75), (13.94708824, 8.5), (10.77166176, 8.5), (9.183948519, 5.75), (10.77166176, 3), align=None)
        Polygon((13.94708824, 20.5), (15.534801481, 23.25), (13.94708824, 26), (10.77166176, 26), (9.183948519, 23.25), (10.77166176, 20.5), align=None)
    extrude(amount=CORTAR_EXTRUIR7_DEPTH + CORTAR_EXTRUIR7_DEPTH_BACK, mode=Mode.SUBTRACT)

    # Chaflán2
    chafl_n2_edges = [part.edges().sort_by_distance(p)[0] for p in [
        (29.5, 12, 54.003581331),
        (17.5, 12, 54.003581331),
        (-17.5, 12, 54.003581331),
        (-29.5, 12, 54.003581331),
    ]]
    chamfer(chafl_n2_edges, length=CHAFL_N2_SIZE)

    # Croquis14 → Saliente-Extruir4 (add)
    with BuildSketch(Plane(origin=(0, 3, 0), x_dir=(1, 0, 0), z_dir=(0, 1, 0))):
        with Locations(Location((0, -42.359375, 0), (0, 0, 90))):
            Circle(CROQUIS14_R)
        with Locations(Location((0, -42.359375, 0), (0, 0, 90))):
            Circle(CROQUIS14_R_2, mode=Mode.SUBTRACT)
    extrude(amount=SALIENTE_EXTRUIR4_DEPTH)

    # Chaflán3
    # the kernel refuses this chamfer: 4 mm, written as the material it adds along each edge
    with BuildSketch(Plane(origin=(0, 3, 42.359375), x_dir=(0, 0, -1), z_dir=(1, 0, 0))) as chafl_n3_piece_1_section:
        Polygon((3 + CHAFL_N3_SIZE, 0), (3, CHAFL_N3_SIZE), (3, 0), align=None)
    chafl_n3_piece_1 = revolve(axis=Axis((0, 3, 42.359375), (0, 1, 0)), mode=Mode.PRIVATE)
    chafl_n3_piece_1 = split(chafl_n3_piece_1, bisect_by=Plane(origin=(3.5, 3.340068144, 36.394025083), z_dir=(-1, 0, 0)), keep=Keep.TOP, mode=Mode.PRIVATE)
    chafl_n3_piece_1 = split(chafl_n3_piece_1, bisect_by=Plane(origin=(-4.39e-07, 3.340068144, 36.90625), z_dir=(0, 0, -1)), keep=Keep.TOP, mode=Mode.PRIVATE)
    chafl_n3_piece_1 = split(chafl_n3_piece_1, bisect_by=Plane(origin=(-3.5, 3.340068144, 36.394025083), z_dir=(1, 0, 0)), keep=Keep.TOP, mode=Mode.PRIVATE)
    add(chafl_n3_piece_1)
    with BuildSketch(Plane(origin=(0, 3, 42.359375), x_dir=(0, 0, -1), z_dir=(1, 0, 0))) as chafl_n3_piece_2_section:
        Polygon((3 + CHAFL_N3_SIZE, 0), (3, CHAFL_N3_SIZE), (3, 0), align=None)
    chafl_n3_piece_2 = revolve(axis=Axis((0, 3, 42.359375), (0, 1, 0)), mode=Mode.PRIVATE)
    chafl_n3_piece_2 = split(chafl_n3_piece_2, bisect_by=Plane(origin=(-2.988556575, 6.479548146, 46.359375), z_dir=(0, 0, -1)), keep=Keep.TOP, mode=Mode.PRIVATE)
    chafl_n3_piece_2 = split(chafl_n3_piece_2, bisect_by=Plane(origin=(3.5, 6.479548146, 40.633931057), z_dir=(-1, 0, 0)), keep=Keep.TOP, mode=Mode.PRIVATE)
    chafl_n3_piece_2 = split(chafl_n3_piece_2, bisect_by=Plane(origin=(-2.988556575, 6.479548146, 36.90625), z_dir=(0, 0, 1)), keep=Keep.TOP, mode=Mode.PRIVATE)
    chafl_n3_piece_2 = split(chafl_n3_piece_2, bisect_by=Plane(origin=(-3.5, 6.479548146, 40.633931057), z_dir=(1, 0, 0)), keep=Keep.TOP, mode=Mode.PRIVATE)
    add(chafl_n3_piece_2)
    with BuildSketch(Plane(origin=(0, 3, 42.359375), x_dir=(0, 0, -1), z_dir=(1, 0, 0))) as chafl_n3_piece_3_section:
        Polygon((3 + CHAFL_N3_SIZE, 0), (3, CHAFL_N3_SIZE), (3, 0), align=None)
    chafl_n3_piece_3 = revolve(axis=Axis((0, 3, 42.359375), (0, 1, 0)), mode=Mode.PRIVATE)
    chafl_n3_piece_3 = split(chafl_n3_piece_3, bisect_by=Plane(origin=(4.611201091, 3.904827773, 46.359375), z_dir=(0, 0, -1)), keep=Keep.TOP, mode=Mode.PRIVATE)
    chafl_n3_piece_3 = split(chafl_n3_piece_3, bisect_by=Plane(origin=(3.5, 3.904827773, 42.156936652), z_dir=(1, 0, 0)), keep=Keep.TOP, mode=Mode.PRIVATE)
    chafl_n3_piece_3 = split(chafl_n3_piece_3, bisect_by=Plane(origin=(4.611201091, 3.904827773, 36.90625), z_dir=(0, 0, 1)), keep=Keep.TOP, mode=Mode.PRIVATE)
    add(chafl_n3_piece_3)
    with BuildSketch(Plane(origin=(0, 3, 42.359375), x_dir=(0, 0, -1), z_dir=(1, 0, 0))) as chafl_n3_piece_4_section:
        Polygon((3 + CHAFL_N3_SIZE, 0), (3, CHAFL_N3_SIZE), (3, 0), align=None)
    chafl_n3_piece_4 = revolve(axis=Axis((0, 3, 42.359375), (0, 1, 0)), mode=Mode.PRIVATE)
    chafl_n3_piece_4 = split(chafl_n3_piece_4, bisect_by=Plane(origin=(-4.611201101, 3.904827807, 46.359375), z_dir=(0, 0, -1)), keep=Keep.TOP, mode=Mode.PRIVATE)
    chafl_n3_piece_4 = split(chafl_n3_piece_4, bisect_by=Plane(origin=(-4.611201101, 3.904827807, 36.90625), z_dir=(0, 0, 1)), keep=Keep.TOP, mode=Mode.PRIVATE)
    chafl_n3_piece_4 = split(chafl_n3_piece_4, bisect_by=Plane(origin=(-3.5, 3.904827807, 42.156936756), z_dir=(-1, 0, 0)), keep=Keep.TOP, mode=Mode.PRIVATE)
    add(chafl_n3_piece_4)

    # Croquis15 → Cortar-Extruir8 (cut, up to next)
    with BuildSketch(Plane(origin=(0, 29, 0), x_dir=(1, 0, 0), z_dir=(0, 1, 0)), mode=Mode.PRIVATE) as cortar_extruir8_sk1:
        with Locations(Location((0, -12.359375, 0), (0, 0, 270))):
            Circle(CROQUIS15_R)
    cortar_extruir8_tool1 = extrude(cortar_extruir8_sk1.sketch, amount=-CORTAR_EXTRUIR8_REACH, mode=Mode.PRIVATE) & part.part
    add(cortar_extruir8_tool1.solids().sort_by_distance((0, 29, 12.359375))[0], mode=Mode.SUBTRACT)

    # Croquis16 → Cortar-Extruir9 (cut, through all)
    with BuildSketch(Plane(origin=(0, 3, 0), x_dir=(1, 0, 0), z_dir=(0, 1, 0))):
        with Locations(Location((-22, -41.359375, 0), (0, 0, 270))):
            Circle(CROQUIS16_R)
        with Locations(Location((22, -41.359375, 0), (0, 0, 270))):
            Circle(CROQUIS16_R)
        with Locations(Location((-22, 2.640625, 0), (0, 0, 270))):
            Circle(CROQUIS16_R)
        with Locations(Location((22, 2.640625, 0), (0, 0, 270))):
            Circle(CROQUIS16_R)
        with Locations(Location((-22, 27.640625, 0), (0, 0, 270))):
            Circle(CROQUIS16_R)
        with Locations(Location((22, 27.640625, 0), (0, 0, 270))):
            Circle(CROQUIS16_R)
        with Locations(Location((-22, -16.359375, 0), (0, 0, 270))):
            Circle(CROQUIS16_R)
        with Locations(Location((22, -16.359375, 0), (0, 0, 270))):
            Circle(CROQUIS16_R)
    extrude(amount=-CORTAR_EXTRUIR9_DEPTH, mode=Mode.SUBTRACT)


solid = part.part
